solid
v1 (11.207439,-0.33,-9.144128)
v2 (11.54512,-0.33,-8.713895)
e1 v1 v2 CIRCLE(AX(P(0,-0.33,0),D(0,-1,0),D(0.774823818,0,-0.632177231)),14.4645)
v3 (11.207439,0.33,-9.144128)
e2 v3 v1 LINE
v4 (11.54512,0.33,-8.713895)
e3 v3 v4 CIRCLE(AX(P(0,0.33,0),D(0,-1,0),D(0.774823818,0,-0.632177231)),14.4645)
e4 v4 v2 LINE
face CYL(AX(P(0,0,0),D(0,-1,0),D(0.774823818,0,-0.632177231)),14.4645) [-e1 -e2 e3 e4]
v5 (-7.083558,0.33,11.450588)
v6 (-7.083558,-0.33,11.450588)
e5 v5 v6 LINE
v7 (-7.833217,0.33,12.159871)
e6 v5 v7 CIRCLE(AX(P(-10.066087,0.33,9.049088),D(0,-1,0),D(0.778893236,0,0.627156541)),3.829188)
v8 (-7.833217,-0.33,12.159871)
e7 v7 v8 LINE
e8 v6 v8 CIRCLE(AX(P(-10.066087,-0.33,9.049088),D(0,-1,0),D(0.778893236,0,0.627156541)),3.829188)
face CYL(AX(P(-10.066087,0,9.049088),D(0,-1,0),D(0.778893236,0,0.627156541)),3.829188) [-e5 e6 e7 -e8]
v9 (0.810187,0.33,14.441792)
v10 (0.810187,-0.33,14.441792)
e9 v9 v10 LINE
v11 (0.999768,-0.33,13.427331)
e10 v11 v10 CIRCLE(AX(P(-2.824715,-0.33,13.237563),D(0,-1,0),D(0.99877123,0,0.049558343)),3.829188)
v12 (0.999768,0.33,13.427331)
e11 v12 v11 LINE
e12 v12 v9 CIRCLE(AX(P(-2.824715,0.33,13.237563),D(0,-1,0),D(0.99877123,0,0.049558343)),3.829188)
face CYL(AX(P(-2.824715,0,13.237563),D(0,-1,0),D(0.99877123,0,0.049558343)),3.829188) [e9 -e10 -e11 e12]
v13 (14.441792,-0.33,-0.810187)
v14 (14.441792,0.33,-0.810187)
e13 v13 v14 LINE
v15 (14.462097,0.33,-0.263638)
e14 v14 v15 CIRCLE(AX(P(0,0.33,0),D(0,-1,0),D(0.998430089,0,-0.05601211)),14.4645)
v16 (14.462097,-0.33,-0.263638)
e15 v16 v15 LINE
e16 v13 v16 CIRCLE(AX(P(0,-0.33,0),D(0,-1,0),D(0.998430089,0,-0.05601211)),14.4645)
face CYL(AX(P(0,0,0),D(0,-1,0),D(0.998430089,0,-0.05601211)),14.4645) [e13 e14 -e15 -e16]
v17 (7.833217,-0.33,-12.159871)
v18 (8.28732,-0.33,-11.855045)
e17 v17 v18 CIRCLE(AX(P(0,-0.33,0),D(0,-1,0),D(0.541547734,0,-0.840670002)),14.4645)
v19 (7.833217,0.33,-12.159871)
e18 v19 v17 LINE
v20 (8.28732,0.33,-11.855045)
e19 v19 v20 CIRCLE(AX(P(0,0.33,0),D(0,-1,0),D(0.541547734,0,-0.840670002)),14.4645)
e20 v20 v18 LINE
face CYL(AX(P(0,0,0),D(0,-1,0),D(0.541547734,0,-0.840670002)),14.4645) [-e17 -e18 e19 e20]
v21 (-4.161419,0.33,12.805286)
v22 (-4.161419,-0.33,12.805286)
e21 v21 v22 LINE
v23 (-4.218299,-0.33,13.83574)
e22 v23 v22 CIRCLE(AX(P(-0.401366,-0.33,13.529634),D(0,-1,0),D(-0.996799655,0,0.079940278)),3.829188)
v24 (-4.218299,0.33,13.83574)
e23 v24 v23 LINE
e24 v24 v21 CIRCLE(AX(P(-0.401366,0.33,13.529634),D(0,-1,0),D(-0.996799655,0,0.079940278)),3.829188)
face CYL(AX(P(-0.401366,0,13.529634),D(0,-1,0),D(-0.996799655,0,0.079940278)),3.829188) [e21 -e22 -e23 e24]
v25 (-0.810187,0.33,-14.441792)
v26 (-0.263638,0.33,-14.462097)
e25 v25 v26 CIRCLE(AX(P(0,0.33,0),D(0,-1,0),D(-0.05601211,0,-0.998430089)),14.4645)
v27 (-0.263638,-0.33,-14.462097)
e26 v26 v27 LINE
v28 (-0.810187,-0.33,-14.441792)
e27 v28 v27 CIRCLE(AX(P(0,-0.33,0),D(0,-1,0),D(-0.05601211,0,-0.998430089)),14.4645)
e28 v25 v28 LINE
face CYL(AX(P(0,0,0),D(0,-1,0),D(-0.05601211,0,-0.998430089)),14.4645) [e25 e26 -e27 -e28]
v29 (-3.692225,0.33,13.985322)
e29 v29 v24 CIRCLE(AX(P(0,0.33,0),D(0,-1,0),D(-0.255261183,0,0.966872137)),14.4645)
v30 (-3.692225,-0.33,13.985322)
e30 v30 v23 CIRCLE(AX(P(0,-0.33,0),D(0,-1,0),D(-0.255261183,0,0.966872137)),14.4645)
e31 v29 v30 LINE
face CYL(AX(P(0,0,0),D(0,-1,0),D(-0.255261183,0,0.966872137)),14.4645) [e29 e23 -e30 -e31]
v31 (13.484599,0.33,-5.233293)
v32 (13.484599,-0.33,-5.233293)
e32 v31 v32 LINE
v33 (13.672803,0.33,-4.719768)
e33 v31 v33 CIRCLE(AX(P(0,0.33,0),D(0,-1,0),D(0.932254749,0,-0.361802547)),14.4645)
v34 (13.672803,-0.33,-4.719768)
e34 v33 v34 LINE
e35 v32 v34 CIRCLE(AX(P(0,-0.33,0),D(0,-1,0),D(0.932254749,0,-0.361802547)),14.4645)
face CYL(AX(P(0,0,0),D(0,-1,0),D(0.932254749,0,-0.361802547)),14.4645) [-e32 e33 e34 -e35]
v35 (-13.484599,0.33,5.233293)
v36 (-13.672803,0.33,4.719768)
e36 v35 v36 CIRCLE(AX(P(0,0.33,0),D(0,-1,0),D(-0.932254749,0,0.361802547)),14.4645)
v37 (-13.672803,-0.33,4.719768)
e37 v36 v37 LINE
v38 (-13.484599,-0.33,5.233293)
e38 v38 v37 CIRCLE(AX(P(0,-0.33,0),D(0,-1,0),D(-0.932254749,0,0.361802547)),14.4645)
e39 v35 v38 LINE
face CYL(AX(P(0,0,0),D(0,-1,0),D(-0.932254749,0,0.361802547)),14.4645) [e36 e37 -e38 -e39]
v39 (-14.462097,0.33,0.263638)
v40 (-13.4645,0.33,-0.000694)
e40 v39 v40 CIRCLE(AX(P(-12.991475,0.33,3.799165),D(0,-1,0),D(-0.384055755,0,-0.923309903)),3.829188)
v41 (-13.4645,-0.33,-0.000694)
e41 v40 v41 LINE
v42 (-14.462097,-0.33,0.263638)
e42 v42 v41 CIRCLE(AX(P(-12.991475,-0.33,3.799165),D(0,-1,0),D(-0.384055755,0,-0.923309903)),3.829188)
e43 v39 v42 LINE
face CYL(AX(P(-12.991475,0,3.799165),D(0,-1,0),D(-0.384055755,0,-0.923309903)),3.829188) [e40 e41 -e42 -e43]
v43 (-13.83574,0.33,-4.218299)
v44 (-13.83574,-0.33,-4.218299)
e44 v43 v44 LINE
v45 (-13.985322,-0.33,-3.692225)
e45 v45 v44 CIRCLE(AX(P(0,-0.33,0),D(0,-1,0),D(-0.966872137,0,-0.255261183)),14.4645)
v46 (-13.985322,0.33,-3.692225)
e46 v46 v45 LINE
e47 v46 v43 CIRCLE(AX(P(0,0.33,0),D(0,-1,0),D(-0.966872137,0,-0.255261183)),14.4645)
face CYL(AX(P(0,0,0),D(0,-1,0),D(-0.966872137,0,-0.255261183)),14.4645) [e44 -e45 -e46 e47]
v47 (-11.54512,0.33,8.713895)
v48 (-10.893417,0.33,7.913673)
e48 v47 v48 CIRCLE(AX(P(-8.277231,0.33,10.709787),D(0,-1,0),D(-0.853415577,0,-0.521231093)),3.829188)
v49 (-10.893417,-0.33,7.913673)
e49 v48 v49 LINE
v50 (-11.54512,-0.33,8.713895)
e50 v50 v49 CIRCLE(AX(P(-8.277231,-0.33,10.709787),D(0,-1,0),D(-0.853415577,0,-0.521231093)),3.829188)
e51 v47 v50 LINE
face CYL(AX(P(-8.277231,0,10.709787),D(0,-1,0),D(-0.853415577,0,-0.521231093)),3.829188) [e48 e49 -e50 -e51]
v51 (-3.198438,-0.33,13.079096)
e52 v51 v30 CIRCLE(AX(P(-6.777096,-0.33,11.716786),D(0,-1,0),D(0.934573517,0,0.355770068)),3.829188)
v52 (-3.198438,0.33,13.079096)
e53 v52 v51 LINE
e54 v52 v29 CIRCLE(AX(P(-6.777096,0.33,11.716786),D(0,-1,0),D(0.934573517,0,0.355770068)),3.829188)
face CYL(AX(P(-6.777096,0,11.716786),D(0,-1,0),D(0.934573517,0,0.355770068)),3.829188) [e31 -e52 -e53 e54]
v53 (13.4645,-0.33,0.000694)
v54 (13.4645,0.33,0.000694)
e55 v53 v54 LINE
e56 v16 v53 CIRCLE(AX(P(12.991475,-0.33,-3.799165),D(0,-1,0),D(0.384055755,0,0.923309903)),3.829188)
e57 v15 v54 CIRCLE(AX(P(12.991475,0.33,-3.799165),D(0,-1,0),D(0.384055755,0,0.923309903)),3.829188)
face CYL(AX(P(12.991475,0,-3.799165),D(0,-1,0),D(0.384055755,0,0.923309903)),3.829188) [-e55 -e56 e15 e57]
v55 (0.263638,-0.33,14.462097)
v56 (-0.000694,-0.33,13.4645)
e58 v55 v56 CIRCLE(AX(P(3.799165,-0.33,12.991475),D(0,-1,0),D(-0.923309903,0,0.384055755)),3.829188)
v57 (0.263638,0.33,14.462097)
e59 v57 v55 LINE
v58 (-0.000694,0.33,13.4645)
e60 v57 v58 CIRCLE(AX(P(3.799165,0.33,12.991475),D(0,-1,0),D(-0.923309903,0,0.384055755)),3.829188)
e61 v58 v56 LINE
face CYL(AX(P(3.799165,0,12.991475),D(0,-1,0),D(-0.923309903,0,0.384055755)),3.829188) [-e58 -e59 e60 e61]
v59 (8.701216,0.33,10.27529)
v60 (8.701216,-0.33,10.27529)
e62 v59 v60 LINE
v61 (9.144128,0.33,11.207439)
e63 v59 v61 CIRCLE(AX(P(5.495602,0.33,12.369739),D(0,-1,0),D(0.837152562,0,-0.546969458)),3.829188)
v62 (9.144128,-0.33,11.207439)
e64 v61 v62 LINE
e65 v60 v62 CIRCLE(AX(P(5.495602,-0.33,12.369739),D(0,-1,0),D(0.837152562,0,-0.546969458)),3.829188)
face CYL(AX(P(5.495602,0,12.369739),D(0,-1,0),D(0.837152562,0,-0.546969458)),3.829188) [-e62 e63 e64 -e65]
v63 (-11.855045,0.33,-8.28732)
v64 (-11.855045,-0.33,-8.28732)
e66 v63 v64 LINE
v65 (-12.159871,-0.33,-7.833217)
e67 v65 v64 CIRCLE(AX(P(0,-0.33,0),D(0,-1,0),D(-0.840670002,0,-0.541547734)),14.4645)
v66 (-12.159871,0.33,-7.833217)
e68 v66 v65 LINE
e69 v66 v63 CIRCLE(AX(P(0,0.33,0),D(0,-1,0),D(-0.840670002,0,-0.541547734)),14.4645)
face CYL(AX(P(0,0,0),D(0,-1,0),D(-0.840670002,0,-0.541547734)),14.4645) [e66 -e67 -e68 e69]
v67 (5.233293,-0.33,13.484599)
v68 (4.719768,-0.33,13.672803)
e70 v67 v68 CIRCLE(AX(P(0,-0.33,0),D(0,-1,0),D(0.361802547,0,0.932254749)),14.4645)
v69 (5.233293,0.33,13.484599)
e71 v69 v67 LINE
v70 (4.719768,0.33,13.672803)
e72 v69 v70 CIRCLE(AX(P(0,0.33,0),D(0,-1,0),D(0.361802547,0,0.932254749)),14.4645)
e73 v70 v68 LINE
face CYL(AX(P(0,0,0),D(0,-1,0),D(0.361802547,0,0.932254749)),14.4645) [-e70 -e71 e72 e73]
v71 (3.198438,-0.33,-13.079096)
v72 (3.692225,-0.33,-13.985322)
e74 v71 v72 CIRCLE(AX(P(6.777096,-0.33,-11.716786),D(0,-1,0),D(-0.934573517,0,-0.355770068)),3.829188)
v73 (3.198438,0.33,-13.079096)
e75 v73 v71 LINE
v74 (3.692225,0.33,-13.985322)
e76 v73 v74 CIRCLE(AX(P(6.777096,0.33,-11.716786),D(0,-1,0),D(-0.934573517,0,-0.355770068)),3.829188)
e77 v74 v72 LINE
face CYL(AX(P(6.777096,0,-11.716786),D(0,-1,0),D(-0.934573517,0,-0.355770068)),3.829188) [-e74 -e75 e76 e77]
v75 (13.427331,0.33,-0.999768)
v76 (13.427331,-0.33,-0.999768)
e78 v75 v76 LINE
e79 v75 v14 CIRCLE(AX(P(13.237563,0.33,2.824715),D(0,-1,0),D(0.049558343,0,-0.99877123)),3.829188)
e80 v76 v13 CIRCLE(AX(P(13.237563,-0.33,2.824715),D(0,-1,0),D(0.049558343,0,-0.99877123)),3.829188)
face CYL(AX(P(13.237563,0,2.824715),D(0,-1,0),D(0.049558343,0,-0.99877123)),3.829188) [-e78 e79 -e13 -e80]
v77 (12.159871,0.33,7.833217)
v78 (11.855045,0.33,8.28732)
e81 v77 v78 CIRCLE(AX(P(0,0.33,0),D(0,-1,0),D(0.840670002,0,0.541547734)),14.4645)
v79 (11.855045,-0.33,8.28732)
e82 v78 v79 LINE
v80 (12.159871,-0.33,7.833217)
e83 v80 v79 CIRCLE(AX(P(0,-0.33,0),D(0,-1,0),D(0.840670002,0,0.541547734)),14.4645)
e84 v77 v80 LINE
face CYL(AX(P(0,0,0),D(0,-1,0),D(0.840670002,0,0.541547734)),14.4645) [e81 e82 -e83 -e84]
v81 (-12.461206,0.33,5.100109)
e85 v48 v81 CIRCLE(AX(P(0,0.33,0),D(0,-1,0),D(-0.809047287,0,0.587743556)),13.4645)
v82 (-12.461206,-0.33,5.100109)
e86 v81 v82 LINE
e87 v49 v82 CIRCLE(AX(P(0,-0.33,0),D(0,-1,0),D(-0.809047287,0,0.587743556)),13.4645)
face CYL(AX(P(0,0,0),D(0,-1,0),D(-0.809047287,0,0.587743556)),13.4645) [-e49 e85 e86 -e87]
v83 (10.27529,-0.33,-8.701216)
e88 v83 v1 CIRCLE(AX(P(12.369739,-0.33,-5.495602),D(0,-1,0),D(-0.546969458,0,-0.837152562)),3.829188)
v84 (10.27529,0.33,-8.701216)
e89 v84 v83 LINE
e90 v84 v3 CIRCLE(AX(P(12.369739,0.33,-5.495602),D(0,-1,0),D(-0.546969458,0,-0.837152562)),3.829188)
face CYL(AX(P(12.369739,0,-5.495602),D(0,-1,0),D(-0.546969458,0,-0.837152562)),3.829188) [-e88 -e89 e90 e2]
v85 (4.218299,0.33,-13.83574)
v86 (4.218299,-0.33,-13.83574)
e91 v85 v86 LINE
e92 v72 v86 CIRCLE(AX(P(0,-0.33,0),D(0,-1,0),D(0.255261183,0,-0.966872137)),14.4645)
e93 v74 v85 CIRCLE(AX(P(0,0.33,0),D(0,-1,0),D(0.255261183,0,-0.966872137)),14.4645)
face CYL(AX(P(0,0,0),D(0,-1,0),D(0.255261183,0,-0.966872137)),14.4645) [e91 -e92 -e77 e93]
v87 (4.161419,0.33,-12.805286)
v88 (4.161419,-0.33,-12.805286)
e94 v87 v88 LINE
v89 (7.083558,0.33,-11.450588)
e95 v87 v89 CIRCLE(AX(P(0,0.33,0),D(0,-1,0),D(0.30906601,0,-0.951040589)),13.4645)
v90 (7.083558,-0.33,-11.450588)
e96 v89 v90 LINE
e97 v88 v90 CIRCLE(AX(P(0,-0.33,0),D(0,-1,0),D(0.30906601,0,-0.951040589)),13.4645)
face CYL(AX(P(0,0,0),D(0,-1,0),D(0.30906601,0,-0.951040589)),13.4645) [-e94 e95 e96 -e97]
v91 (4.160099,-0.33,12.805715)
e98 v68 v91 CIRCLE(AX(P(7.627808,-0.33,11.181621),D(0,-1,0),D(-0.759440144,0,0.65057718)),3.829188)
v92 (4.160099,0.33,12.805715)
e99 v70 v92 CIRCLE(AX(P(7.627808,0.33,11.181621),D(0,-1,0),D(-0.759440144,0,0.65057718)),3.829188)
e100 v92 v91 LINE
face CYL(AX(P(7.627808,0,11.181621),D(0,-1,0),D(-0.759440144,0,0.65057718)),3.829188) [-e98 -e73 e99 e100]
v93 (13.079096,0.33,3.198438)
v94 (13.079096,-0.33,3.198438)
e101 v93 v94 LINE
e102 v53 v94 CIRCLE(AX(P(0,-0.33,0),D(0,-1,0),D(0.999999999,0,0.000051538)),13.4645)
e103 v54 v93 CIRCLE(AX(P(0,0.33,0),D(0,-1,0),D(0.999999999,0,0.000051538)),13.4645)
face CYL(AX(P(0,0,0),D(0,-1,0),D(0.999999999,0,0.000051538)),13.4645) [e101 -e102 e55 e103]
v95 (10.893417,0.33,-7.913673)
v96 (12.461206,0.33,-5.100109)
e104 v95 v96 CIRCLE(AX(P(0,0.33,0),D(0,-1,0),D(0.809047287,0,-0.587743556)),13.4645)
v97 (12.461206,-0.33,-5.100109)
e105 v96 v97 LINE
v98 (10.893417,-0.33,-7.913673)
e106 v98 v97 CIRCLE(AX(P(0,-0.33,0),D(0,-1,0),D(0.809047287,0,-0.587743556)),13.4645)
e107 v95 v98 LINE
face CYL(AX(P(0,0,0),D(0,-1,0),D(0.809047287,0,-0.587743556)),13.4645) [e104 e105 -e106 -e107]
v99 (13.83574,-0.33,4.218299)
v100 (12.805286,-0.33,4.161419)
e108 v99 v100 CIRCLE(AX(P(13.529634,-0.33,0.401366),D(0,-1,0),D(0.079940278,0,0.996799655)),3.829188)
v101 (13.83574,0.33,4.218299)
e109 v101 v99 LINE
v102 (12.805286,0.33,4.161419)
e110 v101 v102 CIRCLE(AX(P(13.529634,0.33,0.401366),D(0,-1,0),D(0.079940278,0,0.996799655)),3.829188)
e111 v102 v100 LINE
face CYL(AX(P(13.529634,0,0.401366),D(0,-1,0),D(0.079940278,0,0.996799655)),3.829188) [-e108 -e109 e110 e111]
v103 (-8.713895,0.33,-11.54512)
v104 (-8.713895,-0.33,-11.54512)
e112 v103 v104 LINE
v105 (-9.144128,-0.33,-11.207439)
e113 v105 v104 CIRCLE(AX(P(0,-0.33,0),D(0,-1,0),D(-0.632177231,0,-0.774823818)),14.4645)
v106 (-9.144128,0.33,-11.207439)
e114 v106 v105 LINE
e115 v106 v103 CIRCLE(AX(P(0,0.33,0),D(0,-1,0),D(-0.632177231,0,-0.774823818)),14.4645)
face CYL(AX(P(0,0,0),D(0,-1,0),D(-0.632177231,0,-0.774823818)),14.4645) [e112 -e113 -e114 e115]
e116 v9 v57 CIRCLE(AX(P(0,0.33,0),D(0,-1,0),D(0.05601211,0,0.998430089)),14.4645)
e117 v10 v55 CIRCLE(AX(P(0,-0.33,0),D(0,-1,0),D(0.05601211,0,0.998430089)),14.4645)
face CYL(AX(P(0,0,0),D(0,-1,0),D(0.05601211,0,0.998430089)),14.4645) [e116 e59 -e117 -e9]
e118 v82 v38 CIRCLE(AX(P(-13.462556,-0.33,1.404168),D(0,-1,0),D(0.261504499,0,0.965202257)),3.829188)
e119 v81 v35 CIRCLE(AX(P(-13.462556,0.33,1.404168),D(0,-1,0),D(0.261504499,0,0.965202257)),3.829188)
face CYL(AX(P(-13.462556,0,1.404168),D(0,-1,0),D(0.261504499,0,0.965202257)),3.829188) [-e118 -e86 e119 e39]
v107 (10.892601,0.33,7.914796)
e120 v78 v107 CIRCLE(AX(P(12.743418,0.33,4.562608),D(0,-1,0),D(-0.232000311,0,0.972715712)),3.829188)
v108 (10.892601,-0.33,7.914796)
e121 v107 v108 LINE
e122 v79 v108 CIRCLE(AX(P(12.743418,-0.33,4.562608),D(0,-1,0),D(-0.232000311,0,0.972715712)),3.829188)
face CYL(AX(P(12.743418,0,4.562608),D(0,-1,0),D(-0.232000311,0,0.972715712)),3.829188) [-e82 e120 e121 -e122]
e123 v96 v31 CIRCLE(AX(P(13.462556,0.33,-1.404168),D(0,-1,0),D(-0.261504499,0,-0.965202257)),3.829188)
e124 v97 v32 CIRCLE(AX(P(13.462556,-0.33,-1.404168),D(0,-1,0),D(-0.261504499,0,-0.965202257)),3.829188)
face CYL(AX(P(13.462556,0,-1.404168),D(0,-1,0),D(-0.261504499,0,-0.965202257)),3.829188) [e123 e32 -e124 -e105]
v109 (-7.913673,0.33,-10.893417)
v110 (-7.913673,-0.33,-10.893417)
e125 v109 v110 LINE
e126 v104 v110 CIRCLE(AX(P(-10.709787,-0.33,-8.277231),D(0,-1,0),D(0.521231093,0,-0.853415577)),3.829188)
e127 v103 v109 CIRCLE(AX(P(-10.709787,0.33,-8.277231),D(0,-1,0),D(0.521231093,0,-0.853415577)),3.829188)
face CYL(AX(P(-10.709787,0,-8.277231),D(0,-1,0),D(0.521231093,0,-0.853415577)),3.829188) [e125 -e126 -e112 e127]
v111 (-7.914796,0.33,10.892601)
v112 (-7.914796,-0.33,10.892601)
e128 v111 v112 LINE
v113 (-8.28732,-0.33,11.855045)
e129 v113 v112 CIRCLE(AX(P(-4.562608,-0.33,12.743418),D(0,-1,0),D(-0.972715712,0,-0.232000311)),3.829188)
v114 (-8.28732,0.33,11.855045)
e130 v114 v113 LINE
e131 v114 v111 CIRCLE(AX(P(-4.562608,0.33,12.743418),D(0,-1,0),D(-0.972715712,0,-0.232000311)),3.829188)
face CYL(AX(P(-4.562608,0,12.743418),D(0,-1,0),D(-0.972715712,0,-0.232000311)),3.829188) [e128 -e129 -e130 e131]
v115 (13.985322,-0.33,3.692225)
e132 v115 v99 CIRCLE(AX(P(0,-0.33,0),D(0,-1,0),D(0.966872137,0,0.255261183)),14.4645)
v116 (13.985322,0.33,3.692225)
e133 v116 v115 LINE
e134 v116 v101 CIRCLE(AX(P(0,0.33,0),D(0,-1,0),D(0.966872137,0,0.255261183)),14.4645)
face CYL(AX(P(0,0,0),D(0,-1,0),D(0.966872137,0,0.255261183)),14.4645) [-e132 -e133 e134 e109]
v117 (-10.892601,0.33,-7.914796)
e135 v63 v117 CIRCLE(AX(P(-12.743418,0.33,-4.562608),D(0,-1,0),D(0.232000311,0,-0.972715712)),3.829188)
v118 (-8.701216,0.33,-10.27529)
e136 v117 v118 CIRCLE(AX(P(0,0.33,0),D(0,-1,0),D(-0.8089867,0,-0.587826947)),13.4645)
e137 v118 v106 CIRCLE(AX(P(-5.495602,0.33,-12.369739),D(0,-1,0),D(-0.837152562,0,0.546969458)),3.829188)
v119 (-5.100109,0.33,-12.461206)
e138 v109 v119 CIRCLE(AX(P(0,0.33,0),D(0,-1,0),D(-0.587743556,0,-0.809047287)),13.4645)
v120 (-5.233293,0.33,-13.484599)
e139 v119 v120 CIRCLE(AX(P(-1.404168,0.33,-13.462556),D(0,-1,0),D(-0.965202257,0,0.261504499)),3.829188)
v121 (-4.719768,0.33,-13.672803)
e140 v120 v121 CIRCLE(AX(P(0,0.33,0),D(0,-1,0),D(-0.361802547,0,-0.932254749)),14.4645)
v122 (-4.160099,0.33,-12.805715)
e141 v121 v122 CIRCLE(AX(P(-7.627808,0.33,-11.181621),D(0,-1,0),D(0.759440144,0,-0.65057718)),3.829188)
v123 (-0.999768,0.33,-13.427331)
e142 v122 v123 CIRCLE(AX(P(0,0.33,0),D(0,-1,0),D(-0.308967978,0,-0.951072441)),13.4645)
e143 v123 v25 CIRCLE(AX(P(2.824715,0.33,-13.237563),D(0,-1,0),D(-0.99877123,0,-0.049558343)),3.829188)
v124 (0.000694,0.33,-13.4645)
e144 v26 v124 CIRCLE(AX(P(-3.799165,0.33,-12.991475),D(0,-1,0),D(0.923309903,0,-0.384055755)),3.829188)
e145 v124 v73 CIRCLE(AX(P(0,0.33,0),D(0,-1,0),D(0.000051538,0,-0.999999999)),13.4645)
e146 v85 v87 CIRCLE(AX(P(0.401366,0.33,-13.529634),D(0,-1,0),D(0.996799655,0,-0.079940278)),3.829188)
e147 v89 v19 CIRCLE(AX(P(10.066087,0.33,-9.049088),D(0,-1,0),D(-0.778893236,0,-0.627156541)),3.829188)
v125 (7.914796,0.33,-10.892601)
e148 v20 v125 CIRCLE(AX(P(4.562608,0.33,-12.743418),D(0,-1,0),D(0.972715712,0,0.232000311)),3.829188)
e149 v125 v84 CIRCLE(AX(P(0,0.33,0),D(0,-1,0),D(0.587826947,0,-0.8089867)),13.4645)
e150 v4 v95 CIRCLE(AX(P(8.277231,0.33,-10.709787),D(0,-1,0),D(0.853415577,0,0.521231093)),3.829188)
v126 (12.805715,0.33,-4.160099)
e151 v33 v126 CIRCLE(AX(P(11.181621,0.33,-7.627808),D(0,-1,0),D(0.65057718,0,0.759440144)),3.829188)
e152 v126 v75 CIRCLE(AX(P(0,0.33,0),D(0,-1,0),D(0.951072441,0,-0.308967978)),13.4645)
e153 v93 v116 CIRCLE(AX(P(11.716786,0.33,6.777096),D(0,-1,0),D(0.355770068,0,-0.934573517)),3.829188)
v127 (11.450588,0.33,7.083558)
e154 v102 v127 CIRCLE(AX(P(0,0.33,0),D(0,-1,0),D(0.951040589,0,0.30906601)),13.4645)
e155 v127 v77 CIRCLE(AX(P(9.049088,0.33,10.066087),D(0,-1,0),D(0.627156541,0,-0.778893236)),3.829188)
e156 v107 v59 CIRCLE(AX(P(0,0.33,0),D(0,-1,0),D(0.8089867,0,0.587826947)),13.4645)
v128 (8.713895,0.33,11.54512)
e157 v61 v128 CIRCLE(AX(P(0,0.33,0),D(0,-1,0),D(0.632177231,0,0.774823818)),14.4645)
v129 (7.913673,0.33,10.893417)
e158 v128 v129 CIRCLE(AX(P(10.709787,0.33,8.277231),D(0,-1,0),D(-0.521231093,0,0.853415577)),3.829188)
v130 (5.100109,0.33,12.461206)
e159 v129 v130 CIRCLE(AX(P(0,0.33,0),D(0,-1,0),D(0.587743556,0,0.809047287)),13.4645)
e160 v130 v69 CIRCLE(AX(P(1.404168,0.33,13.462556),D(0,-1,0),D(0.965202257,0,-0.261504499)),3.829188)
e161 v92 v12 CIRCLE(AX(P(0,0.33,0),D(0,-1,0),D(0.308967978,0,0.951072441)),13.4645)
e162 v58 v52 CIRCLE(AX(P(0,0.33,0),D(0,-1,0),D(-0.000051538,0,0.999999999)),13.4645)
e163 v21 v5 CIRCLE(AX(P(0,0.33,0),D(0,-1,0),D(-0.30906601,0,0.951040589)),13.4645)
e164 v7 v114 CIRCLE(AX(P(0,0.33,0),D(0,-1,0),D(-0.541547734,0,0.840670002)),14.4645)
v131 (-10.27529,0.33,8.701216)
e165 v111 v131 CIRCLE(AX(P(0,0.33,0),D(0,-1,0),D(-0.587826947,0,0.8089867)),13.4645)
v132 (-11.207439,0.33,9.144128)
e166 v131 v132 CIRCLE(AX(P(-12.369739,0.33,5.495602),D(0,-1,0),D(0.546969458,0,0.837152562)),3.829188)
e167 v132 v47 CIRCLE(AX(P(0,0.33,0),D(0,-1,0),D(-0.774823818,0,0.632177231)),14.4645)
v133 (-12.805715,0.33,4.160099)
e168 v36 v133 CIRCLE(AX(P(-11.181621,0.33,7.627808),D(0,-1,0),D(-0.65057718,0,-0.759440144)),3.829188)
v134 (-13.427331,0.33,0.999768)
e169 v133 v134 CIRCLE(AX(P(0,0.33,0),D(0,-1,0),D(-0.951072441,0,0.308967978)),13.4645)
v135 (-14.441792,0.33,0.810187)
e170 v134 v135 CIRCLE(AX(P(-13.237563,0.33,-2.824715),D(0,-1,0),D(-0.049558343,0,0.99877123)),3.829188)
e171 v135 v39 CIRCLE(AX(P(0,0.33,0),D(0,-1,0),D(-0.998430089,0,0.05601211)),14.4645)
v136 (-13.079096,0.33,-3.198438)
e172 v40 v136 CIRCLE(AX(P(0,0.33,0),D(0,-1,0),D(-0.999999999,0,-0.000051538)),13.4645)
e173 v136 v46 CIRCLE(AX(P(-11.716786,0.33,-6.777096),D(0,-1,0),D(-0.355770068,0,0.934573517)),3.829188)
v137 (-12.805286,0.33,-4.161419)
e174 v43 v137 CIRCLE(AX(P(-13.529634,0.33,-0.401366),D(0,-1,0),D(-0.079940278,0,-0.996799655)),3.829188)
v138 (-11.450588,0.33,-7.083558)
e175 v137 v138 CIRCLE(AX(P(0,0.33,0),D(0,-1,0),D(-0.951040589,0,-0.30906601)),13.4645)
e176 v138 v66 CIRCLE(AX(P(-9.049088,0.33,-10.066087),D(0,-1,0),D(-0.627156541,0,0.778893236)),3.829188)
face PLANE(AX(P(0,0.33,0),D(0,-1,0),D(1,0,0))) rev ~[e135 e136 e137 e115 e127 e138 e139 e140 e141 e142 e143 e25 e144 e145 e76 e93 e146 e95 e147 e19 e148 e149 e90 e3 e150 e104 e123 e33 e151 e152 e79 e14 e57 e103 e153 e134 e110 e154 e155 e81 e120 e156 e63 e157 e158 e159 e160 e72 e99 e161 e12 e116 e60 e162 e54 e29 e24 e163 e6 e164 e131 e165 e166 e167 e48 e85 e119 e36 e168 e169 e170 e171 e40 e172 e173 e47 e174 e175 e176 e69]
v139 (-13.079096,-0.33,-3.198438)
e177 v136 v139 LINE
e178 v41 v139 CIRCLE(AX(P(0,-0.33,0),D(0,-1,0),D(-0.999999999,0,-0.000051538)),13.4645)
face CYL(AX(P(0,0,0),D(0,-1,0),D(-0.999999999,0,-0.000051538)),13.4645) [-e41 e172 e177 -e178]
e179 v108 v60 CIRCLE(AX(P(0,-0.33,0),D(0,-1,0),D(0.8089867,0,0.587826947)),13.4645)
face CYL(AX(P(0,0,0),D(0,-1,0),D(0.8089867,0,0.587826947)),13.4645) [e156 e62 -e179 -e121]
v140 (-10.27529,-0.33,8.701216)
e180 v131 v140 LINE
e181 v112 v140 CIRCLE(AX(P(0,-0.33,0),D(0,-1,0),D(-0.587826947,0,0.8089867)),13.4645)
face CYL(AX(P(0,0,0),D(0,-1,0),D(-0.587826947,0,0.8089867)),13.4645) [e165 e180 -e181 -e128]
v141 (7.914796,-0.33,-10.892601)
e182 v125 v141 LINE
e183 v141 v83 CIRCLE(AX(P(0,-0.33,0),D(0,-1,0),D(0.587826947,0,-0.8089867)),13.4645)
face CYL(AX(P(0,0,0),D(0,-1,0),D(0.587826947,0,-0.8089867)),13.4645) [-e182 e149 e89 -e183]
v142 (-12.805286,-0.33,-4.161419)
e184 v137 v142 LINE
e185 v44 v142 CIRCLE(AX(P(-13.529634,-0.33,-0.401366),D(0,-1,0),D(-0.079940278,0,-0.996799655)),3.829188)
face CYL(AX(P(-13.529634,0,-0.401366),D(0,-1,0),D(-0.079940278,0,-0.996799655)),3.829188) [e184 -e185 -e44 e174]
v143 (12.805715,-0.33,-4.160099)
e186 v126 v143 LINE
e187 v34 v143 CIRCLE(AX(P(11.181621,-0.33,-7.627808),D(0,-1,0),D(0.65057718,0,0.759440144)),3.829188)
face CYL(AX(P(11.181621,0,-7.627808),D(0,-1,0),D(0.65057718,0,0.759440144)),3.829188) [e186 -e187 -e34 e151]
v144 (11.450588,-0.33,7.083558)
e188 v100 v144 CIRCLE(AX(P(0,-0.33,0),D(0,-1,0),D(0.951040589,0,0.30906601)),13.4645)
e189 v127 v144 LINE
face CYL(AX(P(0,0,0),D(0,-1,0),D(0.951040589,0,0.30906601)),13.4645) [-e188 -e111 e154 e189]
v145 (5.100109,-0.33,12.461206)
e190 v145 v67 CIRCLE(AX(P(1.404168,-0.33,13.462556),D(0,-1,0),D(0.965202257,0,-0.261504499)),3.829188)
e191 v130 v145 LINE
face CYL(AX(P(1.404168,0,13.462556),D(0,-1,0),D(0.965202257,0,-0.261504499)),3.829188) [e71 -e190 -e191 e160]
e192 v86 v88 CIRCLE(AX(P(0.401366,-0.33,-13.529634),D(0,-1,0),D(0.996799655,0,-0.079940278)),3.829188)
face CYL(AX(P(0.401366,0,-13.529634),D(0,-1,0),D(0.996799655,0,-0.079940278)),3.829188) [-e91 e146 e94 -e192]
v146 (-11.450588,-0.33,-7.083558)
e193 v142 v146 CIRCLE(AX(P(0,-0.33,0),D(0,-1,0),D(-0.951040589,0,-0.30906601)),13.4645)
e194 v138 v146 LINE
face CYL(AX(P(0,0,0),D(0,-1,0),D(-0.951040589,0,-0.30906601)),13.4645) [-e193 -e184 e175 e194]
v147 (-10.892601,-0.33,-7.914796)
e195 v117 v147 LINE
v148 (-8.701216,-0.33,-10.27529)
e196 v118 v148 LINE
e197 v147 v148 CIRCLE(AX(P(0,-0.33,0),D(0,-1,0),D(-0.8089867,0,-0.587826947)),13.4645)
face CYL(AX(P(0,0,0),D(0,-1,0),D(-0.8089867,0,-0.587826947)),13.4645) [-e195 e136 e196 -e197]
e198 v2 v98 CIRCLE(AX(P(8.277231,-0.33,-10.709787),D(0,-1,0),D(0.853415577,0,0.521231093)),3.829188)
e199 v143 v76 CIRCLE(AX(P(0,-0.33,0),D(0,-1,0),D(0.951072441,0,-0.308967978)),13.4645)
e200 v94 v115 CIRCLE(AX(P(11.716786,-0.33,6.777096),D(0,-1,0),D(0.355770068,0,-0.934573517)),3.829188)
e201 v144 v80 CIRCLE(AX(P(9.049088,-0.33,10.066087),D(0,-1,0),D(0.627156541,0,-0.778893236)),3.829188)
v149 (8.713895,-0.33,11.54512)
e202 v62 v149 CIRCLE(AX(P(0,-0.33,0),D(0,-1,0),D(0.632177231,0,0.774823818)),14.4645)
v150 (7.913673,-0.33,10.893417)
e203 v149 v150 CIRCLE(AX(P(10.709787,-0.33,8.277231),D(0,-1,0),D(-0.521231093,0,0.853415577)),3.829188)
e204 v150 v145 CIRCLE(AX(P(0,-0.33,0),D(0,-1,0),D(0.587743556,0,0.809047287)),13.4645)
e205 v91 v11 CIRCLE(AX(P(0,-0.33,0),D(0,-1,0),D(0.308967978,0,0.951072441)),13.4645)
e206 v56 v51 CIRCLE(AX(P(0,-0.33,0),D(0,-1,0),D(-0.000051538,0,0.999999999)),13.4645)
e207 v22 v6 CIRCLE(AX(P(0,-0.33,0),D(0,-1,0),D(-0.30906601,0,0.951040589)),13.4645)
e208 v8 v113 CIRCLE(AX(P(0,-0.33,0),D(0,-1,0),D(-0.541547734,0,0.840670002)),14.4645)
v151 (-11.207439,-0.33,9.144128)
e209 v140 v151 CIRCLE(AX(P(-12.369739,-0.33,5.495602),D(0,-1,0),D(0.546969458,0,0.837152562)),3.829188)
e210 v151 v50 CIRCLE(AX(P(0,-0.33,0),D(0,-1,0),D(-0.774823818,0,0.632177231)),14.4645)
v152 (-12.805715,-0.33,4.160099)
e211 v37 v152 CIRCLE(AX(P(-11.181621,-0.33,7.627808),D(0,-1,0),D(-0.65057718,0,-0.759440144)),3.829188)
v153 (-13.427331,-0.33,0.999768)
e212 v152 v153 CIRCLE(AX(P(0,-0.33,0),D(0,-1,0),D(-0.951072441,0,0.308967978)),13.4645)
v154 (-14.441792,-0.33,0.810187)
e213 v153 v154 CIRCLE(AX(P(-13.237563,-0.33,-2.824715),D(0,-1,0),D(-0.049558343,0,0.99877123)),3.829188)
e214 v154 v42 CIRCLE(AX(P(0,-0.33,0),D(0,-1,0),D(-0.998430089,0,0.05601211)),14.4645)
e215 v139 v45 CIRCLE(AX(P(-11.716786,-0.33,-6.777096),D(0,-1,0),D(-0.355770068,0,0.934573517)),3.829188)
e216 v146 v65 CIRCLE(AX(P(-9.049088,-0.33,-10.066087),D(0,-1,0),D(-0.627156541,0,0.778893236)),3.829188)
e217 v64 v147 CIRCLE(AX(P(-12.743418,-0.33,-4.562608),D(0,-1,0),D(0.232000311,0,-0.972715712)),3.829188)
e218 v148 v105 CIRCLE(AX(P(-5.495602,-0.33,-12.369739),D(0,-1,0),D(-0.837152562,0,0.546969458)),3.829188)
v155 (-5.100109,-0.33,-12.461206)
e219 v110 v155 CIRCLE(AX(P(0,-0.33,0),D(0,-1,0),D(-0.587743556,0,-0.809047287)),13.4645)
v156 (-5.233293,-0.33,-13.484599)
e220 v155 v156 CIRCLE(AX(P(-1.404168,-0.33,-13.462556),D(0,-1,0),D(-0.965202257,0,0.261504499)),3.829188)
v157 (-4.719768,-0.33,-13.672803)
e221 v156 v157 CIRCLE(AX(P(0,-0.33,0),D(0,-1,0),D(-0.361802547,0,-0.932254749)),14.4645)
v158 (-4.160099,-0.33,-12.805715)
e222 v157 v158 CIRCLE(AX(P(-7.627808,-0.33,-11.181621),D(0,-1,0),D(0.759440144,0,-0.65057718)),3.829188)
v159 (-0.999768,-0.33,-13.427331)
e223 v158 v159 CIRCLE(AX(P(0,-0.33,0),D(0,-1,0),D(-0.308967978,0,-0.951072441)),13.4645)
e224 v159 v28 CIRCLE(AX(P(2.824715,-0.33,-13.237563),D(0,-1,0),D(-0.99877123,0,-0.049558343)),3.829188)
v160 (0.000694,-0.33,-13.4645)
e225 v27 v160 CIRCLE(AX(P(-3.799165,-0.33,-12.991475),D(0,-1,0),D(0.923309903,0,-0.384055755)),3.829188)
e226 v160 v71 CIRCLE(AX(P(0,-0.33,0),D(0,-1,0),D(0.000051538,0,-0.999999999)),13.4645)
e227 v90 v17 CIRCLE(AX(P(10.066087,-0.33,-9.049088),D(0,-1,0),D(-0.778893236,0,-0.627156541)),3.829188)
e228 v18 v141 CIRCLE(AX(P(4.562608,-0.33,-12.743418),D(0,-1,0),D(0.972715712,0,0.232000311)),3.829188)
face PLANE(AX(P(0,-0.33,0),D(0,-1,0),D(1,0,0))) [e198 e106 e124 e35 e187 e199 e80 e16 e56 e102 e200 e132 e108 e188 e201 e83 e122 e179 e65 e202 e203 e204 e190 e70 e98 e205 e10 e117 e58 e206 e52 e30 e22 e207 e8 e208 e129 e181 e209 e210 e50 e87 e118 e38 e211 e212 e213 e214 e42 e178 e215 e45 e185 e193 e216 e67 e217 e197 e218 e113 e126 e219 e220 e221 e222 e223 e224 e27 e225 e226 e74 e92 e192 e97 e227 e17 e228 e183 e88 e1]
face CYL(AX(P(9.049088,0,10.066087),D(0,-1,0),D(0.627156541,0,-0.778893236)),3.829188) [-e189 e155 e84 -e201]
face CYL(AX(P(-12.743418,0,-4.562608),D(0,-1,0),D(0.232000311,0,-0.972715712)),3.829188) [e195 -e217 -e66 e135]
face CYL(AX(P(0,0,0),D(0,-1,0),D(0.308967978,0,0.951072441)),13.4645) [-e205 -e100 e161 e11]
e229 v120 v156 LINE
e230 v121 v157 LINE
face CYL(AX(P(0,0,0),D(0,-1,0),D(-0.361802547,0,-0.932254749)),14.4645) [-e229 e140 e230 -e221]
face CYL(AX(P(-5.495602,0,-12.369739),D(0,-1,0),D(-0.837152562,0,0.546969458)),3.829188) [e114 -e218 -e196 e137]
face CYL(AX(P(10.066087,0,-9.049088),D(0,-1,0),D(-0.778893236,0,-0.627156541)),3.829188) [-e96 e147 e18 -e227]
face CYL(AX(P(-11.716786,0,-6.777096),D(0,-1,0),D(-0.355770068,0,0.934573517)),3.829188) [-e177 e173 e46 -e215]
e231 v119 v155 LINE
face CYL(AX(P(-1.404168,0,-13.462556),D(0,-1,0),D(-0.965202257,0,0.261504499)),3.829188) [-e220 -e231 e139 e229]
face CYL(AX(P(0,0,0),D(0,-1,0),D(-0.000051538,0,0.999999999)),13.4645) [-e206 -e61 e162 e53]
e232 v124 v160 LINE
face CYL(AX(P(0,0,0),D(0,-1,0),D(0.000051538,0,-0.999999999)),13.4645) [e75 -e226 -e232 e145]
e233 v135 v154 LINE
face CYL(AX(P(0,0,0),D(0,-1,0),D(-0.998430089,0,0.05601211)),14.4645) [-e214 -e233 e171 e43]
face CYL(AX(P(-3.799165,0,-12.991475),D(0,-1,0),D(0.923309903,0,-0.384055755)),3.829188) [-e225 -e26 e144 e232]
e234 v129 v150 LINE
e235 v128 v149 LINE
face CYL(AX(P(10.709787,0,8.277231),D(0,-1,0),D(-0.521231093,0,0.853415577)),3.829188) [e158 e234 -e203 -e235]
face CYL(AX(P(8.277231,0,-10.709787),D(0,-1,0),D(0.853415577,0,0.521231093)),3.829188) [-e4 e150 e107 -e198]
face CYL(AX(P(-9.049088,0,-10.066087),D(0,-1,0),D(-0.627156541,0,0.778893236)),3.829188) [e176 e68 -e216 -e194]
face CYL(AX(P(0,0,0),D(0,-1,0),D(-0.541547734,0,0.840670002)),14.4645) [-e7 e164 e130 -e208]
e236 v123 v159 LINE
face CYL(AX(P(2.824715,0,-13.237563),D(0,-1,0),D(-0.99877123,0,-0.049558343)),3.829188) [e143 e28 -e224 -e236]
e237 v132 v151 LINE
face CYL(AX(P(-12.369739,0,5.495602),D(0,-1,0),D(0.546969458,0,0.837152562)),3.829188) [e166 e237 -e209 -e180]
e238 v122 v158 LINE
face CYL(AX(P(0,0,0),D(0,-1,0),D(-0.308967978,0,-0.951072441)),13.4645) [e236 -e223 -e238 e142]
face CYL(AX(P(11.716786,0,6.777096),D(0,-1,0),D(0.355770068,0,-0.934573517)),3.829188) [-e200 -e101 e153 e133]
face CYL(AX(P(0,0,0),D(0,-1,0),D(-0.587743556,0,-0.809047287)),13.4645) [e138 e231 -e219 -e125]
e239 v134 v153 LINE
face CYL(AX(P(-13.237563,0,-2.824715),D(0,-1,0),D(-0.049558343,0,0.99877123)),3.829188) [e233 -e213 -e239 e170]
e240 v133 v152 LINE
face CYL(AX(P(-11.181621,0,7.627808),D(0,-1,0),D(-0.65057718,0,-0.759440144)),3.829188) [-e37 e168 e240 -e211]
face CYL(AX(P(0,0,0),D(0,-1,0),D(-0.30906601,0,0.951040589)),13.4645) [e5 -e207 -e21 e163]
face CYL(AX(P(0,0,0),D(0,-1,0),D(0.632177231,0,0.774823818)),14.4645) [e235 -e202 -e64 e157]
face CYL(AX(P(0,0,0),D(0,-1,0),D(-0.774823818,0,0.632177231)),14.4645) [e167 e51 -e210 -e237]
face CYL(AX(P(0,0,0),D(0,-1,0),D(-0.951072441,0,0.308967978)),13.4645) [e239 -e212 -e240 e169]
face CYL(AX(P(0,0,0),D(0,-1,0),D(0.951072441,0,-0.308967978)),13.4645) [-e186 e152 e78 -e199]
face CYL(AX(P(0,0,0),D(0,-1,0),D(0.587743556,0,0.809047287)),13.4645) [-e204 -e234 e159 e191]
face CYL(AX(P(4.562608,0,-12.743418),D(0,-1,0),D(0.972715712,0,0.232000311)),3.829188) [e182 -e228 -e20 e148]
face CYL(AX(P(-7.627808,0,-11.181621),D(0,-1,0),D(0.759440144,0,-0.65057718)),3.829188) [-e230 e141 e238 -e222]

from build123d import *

# Parameters (mm, degrees)
F3_DEPTH      = 0.33
F3_DEPTH_BACK = 0.33


with BuildPart() as f3:
    # F2 (on Front) → F3 (new body, two sides)
    with BuildSketch(Plane.XZ) as f3_sk:
        with BuildLine():
            ThreePointArc((13.427331249, -0.9997678629), (13.4552046036, -0.5002292714), (13.4645, 0))
            ThreePointArc((13.4645, 0), (13.4644999955, 0.0003469704), (13.4644999821, 0.0006939409))
            ThreePointArc((13.4644999821, 0.0006939409), (13.3677602926, 1.6111315933), (13.0790961409, 3.1984378043))
            ThreePointArc((13.0790961409, 3.1984378043), (12.9511444719, 3.68247432), (12.8052860071, 4.1614192922))
            ThreePointArc((12.8052860071, 4.1614192922), (12.215628492, 5.6631423075), (11.4505879751, 7.0835580943))
            ThreePointArc((11.4505879751, 7.0835580943), (11.1793231973, 7.5043649366), (10.8926014181, 7.9147959289))
            ThreePointArc((10.8926014181, 7.9147959289), (9.8677458634, 9.1608051953), (8.7012164773, 10.275290364))
            ThreePointArc((8.7012164773, 10.275290364), (8.3131918771, 10.5916760271), (7.913673109, 10.8934171945))
            ThreePointArc((7.913673109, 10.8934171945), (6.553939517, 11.7617446434), (5.1001092858, 12.4612056208))
            ThreePointArc((5.1001092858, 12.4612056208), (4.6333074147, 12.6422000716), (4.1600993383, 12.8057148862))
            ThreePointArc((4.1600993383, 12.8057148862), (2.5985879067, 13.211362577), (0.9997678629, 13.427331249))
            ThreePointArc((0.9997678629, 13.427331249), (0.4998825403, 13.4552174897), (-0.0006939409, 13.4644999821))
            ThreePointArc((-0.0006939409, 13.4644999821), (-1.6111315933, 13.3677602926), (-3.1984378043, 13.0790961409))
            ThreePointArc((-3.1984378043, 13.0790961409), (-3.68247432, 12.9511444719), (-4.1614192922, 12.8052860071))
            ThreePointArc((-4.1614192922, 12.8052860071), (-5.6631423075, 12.215628492), (-7.0835580943, 11.4505879751))
            ThreePointArc((-7.0835580943, 11.4505879751), (-7.5043649366, 11.1793231973), (-7.9147959289, 10.8926014181))
            ThreePointArc((-7.9147959289, 10.8926014181), (-9.1608051953, 9.8677458634), (-10.275290364, 8.7012164773))
            ThreePointArc((-10.275290364, 8.7012164773), (-10.5916760271, 8.3131918771), (-10.8934171945, 7.913673109))
            ThreePointArc((-10.8934171945, 7.913673109), (-11.7617446434, 6.553939517), (-12.4612056208, 5.1001092858))
            ThreePointArc((-12.4612056208, 5.1001092858), (-12.6422000716, 4.6333074147), (-12.8057148862, 4.1600993383))
            ThreePointArc((-12.8057148862, 4.1600993383), (-13.211362577, 2.5985879067), (-13.427331249, 0.9997678629))
            ThreePointArc((-13.427331249, 0.9997678629), (-13.4552174897, 0.4998825403), (-13.4644999821, -0.0006939409))
            ThreePointArc((-13.4644999821, -0.0006939409), (-13.3677602926, -1.6111315933), (-13.0790961409, -3.1984378043))
            ThreePointArc((-13.0790961409, -3.1984378043), (-12.9511444719, -3.68247432), (-12.8052860071, -4.1614192922))
            ThreePointArc((-12.8052860071, -4.1614192922), (-12.215628492, -5.6631423075), (-11.4505879751, -7.0835580943))
            ThreePointArc((-11.4505879751, -7.0835580943), (-11.1793231973, -7.5043649366), (-10.8926014181, -7.9147959289))
            ThreePointArc((-10.8926014181, -7.9147959289), (-9.8677458634, -9.1608051953), (-8.7012164773, -10.275290364))
            ThreePointArc((-8.7012164773, -10.275290364), (-8.3131918771, -10.5916760271), (-7.913673109, -10.8934171945))
            ThreePointArc((-7.913673109, -10.8934171945), (-6.553939517, -11.7617446434), (-5.1001092858, -12.4612056208))
            ThreePointArc((-5.1001092858, -12.4612056208), (-4.6333074147, -12.6422000716), (-4.1600993383, -12.8057148862))
            ThreePointArc((-4.1600993383, -12.8057148862), (-2.5985879067, -13.211362577), (-0.9997678629, -13.427331249))
            ThreePointArc((-0.9997678629, -13.427331249), (-0.4998825403, -13.4552174897), (0.0006939409, -13.4644999821))
            ThreePointArc((0.0006939409, -13.4644999821), (1.6111315933, -13.3677602926), (3.1984378043, -13.0790961409))
            ThreePointArc((3.1984378043, -13.0790961409), (3.68247432, -12.9511444719), (4.1614192922, -12.8052860071))
            ThreePointArc((4.1614192922, -12.8052860071), (5.6631423075, -12.215628492), (7.0835580943, -11.4505879751))
            ThreePointArc((7.0835580943, -11.4505879751), (7.5043649366, -11.1793231973), (7.9147959289, -10.8926014181))
            ThreePointArc((7.9147959289, -10.8926014181), (9.1608051953, -9.8677458634), (10.275290364, -8.7012164773))
            ThreePointArc((10.275290364, -8.7012164773), (10.5916760271, -8.3131918771), (10.8934171945, -7.913673109))
            ThreePointArc((10.8934171945, -7.913673109), (11.7617446434, -6.553939517), (12.4612056208, -5.1001092858))
            ThreePointArc((12.4612056208, -5.1001092858), (12.6422000716, -4.6333074147), (12.8057148862, -4.1600993383))
            ThreePointArc((12.8057148862, -4.1600993383), (13.211362577, -2.5985879067), (13.427331249, -0.9997678629))
        make_face()
        with BuildLine():
            ThreePointArc((13.4644999821, 0.0006939409), (13.4644999955, 0.0003469704), (13.4645, 0))
            ThreePointArc((13.4645, 0), (13.4552046036, -0.5002292714), (13.427331249, -0.9997678629))
            ThreePointArc((13.427331249, -0.9997678629), (13.9409777525, -0.9393106229), (14.4417920292, -0.8101871604))
            ThreePointArc((14.4417920292, -0.8101871604), (14.4545280835, -0.5370085042), (14.4620971963, -0.2636378879))
            ThreePointArc((14.4620971963, -0.2636378879), (13.9722445576, -0.0977095878), (13.4644999821, 0.0006939409))
        make_face()
        with BuildLine():
            ThreePointArc((12.8052860071, 4.1614192922), (12.9511444719, 3.68247432), (13.0790961409, 3.1984378043))
            ThreePointArc((13.0790961409, 3.1984378043), (13.5489206805, 3.4146615549), (13.9853220175, 3.692225388))
            ThreePointArc((13.9853220175, 3.692225388), (13.9130178777, 3.9559693863), (13.8357403655, 4.2182992767))
            ThreePointArc((13.8357403655, 4.2182992767), (13.3185881569, 4.2247336777), (12.8052860071, 4.1614192922))
        make_face()
        with BuildLine():
            ThreePointArc((13.6728031901, -4.7197683392), (13.2582003107, -4.410588358), (12.8057148862, -4.1600993383))
            ThreePointArc((12.8057148862, -4.1600993383), (12.6422000716, -4.6333074147), (12.4612056208, -5.1001092858))
            ThreePointArc((12.4612056208, -5.1001092858), (12.9683947895, -5.2013365325), (13.4845988152, -5.2332929446))
            ThreePointArc((13.4845988152, -5.2332929446), (13.5811283699, -4.9774202606), (13.6728031901, -4.7197683392))
        make_face()
        with BuildLine():
            ThreePointArc((10.8926014181, 7.9147959289), (11.1793231973, 7.5043649366), (11.4505879751, 7.0835580943))
            ThreePointArc((11.4505879751, 7.0835580943), (11.8306008514, 7.4343828685), (12.1598712453, 7.8332171901))
            ThreePointArc((12.1598712453, 7.8332171901), (12.0096045443, 8.0617094303), (11.8550448685, 8.2873199175))
            ThreePointArc((11.8550448685, 8.2873199175), (11.3612155514, 8.1336305754), (10.8926014181, 7.9147959289))
        make_face()
        with BuildLine():
            ThreePointArc((11.5451199436, -8.7138949808), (11.246351042, -8.2917280094), (10.8934171945, -7.913673109))
            ThreePointArc((10.8934171945, -7.913673109), (10.5916760271, -8.3131918771), (10.275290364, -8.7012164773))
            ThreePointArc((10.275290364, -8.7012164773), (10.7263749885, -8.9542193824), (11.2074391164, -9.1441275528))
            ThreePointArc((11.2074391164, -9.1441275528), (11.3783131861, -8.9306074423), (11.5451199436, -8.7138949808))
        make_face()
        with BuildLine():
            ThreePointArc((7.913673109, 10.8934171945), (8.3131918771, 10.5916760271), (8.7012164773, 10.275290364))
            ThreePointArc((8.7012164773, 10.275290364), (8.9542193824, 10.7263749885), (9.1441275528, 11.2074391164))
            ThreePointArc((9.1441275528, 11.2074391164), (8.9306074423, 11.3783131861), (8.7138949808, 11.5451199436))
            ThreePointArc((8.7138949808, 11.5451199436), (8.2917280094, 11.246351042), (7.913673109, 10.8934171945))
        make_face()
        with BuildLine():
            ThreePointArc((8.2873199175, -11.8550448685), (8.1336305754, -11.3612155514), (7.9147959289, -10.8926014181))
            ThreePointArc((7.9147959289, -10.8926014181), (7.5043649366, -11.1793231973), (7.0835580943, -11.4505879751))
            ThreePointArc((7.0835580943, -11.4505879751), (7.4343828685, -11.8306008514), (7.8332171901, -12.1598712453))
            ThreePointArc((7.8332171901, -12.1598712453), (8.0617094303, -12.0096045443), (8.2873199175, -11.8550448685))
        make_face()
        with BuildLine():
            ThreePointArc((4.1600993383, 12.8057148862), (4.6333074147, 12.6422000716), (5.1001092858, 12.4612056208))
            ThreePointArc((5.1001092858, 12.4612056208), (5.2013365325, 12.9683947895), (5.2332929446, 13.4845988152))
            ThreePointArc((5.2332929446, 13.4845988152), (4.9774202606, 13.5811283699), (4.7197683392, 13.6728031901))
            ThreePointArc((4.7197683392, 13.6728031901), (4.410588358, 13.2582003107), (4.1600993383, 12.8057148862))
        make_face()
        with BuildLine():
            ThreePointArc((4.2182992767, -13.8357403655), (4.2247336777, -13.3185881569), (4.1614192922, -12.8052860071))
            ThreePointArc((4.1614192922, -12.8052860071), (3.68247432, -12.9511444719), (3.1984378043, -13.0790961409))
            ThreePointArc((3.1984378043, -13.0790961409), (3.4146615549, -13.5489206805), (3.692225388, -13.9853220175))
            ThreePointArc((3.692225388, -13.9853220175), (3.9559693863, -13.9130178777), (4.2182992767, -13.8357403655))
        make_face()
        with BuildLine():
            ThreePointArc((-0.0006939409, 13.4644999821), (0.4998825403, 13.4552174897), (0.9997678629, 13.427331249))
            ThreePointArc((0.9997678629, 13.427331249), (0.9393106229, 13.9409777525), (0.8101871604, 14.4417920292))
            ThreePointArc((0.8101871604, 14.4417920292), (0.5370085042, 14.4545280835), (0.2636378879, 14.4620971963))
            ThreePointArc((0.2636378879, 14.4620971963), (0.0977095878, 13.9722445576), (-0.0006939409, 13.4644999821))
        make_face()
        with BuildLine():
            ThreePointArc((-0.2636378879, -14.4620971963), (-0.0977095878, -13.9722445576), (0.0006939409, -13.4644999821))
            ThreePointArc((0.0006939409, -13.4644999821), (-0.4998825403, -13.4552174897), (-0.9997678629, -13.427331249))
            ThreePointArc((-0.9997678629, -13.427331249), (-0.9393106229, -13.9409777525), (-0.8101871604, -14.4417920292))
            ThreePointArc((-0.8101871604, -14.4417920292), (-0.5370085042, -14.4545280835), (-0.2636378879, -14.4620971963))
        make_face()
        with BuildLine():
            ThreePointArc((-4.1614192922, 12.8052860071), (-3.68247432, 12.9511444719), (-3.1984378043, 13.0790961409))
            ThreePointArc((-3.1984378043, 13.0790961409), (-3.4146615549, 13.5489206805), (-3.692225388, 13.9853220175))
            ThreePointArc((-3.692225388, 13.9853220175), (-3.9559693863, 13.9130178777), (-4.2182992767, 13.8357403655))
            ThreePointArc((-4.2182992767, 13.8357403655), (-4.2247336777, 13.3185881569), (-4.1614192922, 12.8052860071))
        make_face()
        with BuildLine():
            ThreePointArc((-4.7197683392, -13.6728031901), (-4.410588358, -13.2582003107), (-4.1600993383, -12.8057148862))
            ThreePointArc((-4.1600993383, -12.8057148862), (-4.6333074147, -12.6422000716), (-5.1001092858, -12.4612056208))
            ThreePointArc((-5.1001092858, -12.4612056208), (-5.2013365325, -12.9683947895), (-5.2332929446, -13.4845988152))
            ThreePointArc((-5.2332929446, -13.4845988152), (-4.9774202606, -13.5811283699), (-4.7197683392, -13.6728031901))
        make_face()
        with BuildLine():
            ThreePointArc((-7.9147959289, 10.8926014181), (-7.5043649366, 11.1793231973), (-7.0835580943, 11.4505879751))
            ThreePointArc((-7.0835580943, 11.4505879751), (-7.4343828685, 11.8306008514), (-7.8332171901, 12.1598712453))
            ThreePointArc((-7.8332171901, 12.1598712453), (-8.0617094303, 12.0096045443), (-8.2873199175, 11.8550448685))
            ThreePointArc((-8.2873199175, 11.8550448685), (-8.1336305754, 11.3612155514), (-7.9147959289, 10.8926014181))
        make_face()
        with BuildLine():
            ThreePointArc((-8.7138949808, -11.5451199436), (-8.2917280094, -11.246351042), (-7.913673109, -10.8934171945))
            ThreePointArc((-7.913673109, -10.8934171945), (-8.3131918771, -10.5916760271), (-8.7012164773, -10.275290364))
            ThreePointArc((-8.7012164773, -10.275290364), (-8.9542193824, -10.7263749885), (-9.1441275528, -11.2074391164))
            ThreePointArc((-9.1441275528, -11.2074391164), (-8.9306074423, -11.3783131861), (-8.7138949808, -11.5451199436))
        make_face()
        with BuildLine():
            ThreePointArc((-10.8934171945, 7.913673109), (-10.5916760271, 8.3131918771), (-10.275290364, 8.7012164773))
            ThreePointArc((-10.275290364, 8.7012164773), (-10.7263749885, 8.9542193824), (-11.2074391164, 9.1441275528))
            ThreePointArc((-11.2074391164, 9.1441275528), (-11.3783131861, 8.9306074423), (-11.5451199436, 8.7138949808))
            ThreePointArc((-11.5451199436, 8.7138949808), (-11.246351042, 8.2917280094), (-10.8934171945, 7.913673109))
        make_face()
        with BuildLine():
            ThreePointArc((-11.8550448685, -8.2873199175), (-11.3612155514, -8.1336305754), (-10.8926014181, -7.9147959289))
            ThreePointArc((-10.8926014181, -7.9147959289), (-11.1793231973, -7.5043649366), (-11.4505879751, -7.0835580943))
            ThreePointArc((-11.4505879751, -7.0835580943), (-11.8306008514, -7.4343828685), (-12.1598712453, -7.8332171901))
            ThreePointArc((-12.1598712453, -7.8332171901), (-12.0096045443, -8.0617094303), (-11.8550448685, -8.2873199175))
        make_face()
        with BuildLine():
            ThreePointArc((-12.8057148862, 4.1600993383), (-12.6422000716, 4.6333074147), (-12.4612056208, 5.1001092858))
            ThreePointArc((-12.4612056208, 5.1001092858), (-12.9683947895, 5.2013365325), (-13.4845988152, 5.2332929446))
            ThreePointArc((-13.4845988152, 5.2332929446), (-13.5811283699, 4.9774202606), (-13.6728031901, 4.7197683392))
            ThreePointArc((-13.6728031901, 4.7197683392), (-13.2582003107, 4.410588358), (-12.8057148862, 4.1600993383))
        make_face()
        with BuildLine():
            ThreePointArc((-13.8357403655, -4.2182992767), (-13.3185881569, -4.2247336777), (-12.8052860071, -4.1614192922))
            ThreePointArc((-12.8052860071, -4.1614192922), (-12.9511444719, -3.68247432), (-13.0790961409, -3.1984378043))
            ThreePointArc((-13.0790961409, -3.1984378043), (-13.5489206805, -3.4146615549), (-13.9853220175, -3.692225388))
            ThreePointArc((-13.9853220175, -3.692225388), (-13.9130178777, -3.9559693863), (-13.8357403655, -4.2182992767))
        make_face()
        with BuildLine():
            ThreePointArc((-13.4644999821, -0.0006939409), (-13.4552174897, 0.4998825403), (-13.427331249, 0.9997678629))
            ThreePointArc((-13.427331249, 0.9997678629), (-13.9409777525, 0.9393106229), (-14.4417920292, 0.8101871604))
            ThreePointArc((-14.4417920292, 0.8101871604), (-14.4545280835, 0.5370085042), (-14.4620971963, 0.2636378879))
            ThreePointArc((-14.4620971963, 0.2636378879), (-13.9722445576, 0.0977095878), (-13.4644999821, -0.0006939409))
        make_face()
    extrude(amount=F3_DEPTH)
    extrude(f3_sk.sketch, amount=-F3_DEPTH_BACK)


solid = f3.part
